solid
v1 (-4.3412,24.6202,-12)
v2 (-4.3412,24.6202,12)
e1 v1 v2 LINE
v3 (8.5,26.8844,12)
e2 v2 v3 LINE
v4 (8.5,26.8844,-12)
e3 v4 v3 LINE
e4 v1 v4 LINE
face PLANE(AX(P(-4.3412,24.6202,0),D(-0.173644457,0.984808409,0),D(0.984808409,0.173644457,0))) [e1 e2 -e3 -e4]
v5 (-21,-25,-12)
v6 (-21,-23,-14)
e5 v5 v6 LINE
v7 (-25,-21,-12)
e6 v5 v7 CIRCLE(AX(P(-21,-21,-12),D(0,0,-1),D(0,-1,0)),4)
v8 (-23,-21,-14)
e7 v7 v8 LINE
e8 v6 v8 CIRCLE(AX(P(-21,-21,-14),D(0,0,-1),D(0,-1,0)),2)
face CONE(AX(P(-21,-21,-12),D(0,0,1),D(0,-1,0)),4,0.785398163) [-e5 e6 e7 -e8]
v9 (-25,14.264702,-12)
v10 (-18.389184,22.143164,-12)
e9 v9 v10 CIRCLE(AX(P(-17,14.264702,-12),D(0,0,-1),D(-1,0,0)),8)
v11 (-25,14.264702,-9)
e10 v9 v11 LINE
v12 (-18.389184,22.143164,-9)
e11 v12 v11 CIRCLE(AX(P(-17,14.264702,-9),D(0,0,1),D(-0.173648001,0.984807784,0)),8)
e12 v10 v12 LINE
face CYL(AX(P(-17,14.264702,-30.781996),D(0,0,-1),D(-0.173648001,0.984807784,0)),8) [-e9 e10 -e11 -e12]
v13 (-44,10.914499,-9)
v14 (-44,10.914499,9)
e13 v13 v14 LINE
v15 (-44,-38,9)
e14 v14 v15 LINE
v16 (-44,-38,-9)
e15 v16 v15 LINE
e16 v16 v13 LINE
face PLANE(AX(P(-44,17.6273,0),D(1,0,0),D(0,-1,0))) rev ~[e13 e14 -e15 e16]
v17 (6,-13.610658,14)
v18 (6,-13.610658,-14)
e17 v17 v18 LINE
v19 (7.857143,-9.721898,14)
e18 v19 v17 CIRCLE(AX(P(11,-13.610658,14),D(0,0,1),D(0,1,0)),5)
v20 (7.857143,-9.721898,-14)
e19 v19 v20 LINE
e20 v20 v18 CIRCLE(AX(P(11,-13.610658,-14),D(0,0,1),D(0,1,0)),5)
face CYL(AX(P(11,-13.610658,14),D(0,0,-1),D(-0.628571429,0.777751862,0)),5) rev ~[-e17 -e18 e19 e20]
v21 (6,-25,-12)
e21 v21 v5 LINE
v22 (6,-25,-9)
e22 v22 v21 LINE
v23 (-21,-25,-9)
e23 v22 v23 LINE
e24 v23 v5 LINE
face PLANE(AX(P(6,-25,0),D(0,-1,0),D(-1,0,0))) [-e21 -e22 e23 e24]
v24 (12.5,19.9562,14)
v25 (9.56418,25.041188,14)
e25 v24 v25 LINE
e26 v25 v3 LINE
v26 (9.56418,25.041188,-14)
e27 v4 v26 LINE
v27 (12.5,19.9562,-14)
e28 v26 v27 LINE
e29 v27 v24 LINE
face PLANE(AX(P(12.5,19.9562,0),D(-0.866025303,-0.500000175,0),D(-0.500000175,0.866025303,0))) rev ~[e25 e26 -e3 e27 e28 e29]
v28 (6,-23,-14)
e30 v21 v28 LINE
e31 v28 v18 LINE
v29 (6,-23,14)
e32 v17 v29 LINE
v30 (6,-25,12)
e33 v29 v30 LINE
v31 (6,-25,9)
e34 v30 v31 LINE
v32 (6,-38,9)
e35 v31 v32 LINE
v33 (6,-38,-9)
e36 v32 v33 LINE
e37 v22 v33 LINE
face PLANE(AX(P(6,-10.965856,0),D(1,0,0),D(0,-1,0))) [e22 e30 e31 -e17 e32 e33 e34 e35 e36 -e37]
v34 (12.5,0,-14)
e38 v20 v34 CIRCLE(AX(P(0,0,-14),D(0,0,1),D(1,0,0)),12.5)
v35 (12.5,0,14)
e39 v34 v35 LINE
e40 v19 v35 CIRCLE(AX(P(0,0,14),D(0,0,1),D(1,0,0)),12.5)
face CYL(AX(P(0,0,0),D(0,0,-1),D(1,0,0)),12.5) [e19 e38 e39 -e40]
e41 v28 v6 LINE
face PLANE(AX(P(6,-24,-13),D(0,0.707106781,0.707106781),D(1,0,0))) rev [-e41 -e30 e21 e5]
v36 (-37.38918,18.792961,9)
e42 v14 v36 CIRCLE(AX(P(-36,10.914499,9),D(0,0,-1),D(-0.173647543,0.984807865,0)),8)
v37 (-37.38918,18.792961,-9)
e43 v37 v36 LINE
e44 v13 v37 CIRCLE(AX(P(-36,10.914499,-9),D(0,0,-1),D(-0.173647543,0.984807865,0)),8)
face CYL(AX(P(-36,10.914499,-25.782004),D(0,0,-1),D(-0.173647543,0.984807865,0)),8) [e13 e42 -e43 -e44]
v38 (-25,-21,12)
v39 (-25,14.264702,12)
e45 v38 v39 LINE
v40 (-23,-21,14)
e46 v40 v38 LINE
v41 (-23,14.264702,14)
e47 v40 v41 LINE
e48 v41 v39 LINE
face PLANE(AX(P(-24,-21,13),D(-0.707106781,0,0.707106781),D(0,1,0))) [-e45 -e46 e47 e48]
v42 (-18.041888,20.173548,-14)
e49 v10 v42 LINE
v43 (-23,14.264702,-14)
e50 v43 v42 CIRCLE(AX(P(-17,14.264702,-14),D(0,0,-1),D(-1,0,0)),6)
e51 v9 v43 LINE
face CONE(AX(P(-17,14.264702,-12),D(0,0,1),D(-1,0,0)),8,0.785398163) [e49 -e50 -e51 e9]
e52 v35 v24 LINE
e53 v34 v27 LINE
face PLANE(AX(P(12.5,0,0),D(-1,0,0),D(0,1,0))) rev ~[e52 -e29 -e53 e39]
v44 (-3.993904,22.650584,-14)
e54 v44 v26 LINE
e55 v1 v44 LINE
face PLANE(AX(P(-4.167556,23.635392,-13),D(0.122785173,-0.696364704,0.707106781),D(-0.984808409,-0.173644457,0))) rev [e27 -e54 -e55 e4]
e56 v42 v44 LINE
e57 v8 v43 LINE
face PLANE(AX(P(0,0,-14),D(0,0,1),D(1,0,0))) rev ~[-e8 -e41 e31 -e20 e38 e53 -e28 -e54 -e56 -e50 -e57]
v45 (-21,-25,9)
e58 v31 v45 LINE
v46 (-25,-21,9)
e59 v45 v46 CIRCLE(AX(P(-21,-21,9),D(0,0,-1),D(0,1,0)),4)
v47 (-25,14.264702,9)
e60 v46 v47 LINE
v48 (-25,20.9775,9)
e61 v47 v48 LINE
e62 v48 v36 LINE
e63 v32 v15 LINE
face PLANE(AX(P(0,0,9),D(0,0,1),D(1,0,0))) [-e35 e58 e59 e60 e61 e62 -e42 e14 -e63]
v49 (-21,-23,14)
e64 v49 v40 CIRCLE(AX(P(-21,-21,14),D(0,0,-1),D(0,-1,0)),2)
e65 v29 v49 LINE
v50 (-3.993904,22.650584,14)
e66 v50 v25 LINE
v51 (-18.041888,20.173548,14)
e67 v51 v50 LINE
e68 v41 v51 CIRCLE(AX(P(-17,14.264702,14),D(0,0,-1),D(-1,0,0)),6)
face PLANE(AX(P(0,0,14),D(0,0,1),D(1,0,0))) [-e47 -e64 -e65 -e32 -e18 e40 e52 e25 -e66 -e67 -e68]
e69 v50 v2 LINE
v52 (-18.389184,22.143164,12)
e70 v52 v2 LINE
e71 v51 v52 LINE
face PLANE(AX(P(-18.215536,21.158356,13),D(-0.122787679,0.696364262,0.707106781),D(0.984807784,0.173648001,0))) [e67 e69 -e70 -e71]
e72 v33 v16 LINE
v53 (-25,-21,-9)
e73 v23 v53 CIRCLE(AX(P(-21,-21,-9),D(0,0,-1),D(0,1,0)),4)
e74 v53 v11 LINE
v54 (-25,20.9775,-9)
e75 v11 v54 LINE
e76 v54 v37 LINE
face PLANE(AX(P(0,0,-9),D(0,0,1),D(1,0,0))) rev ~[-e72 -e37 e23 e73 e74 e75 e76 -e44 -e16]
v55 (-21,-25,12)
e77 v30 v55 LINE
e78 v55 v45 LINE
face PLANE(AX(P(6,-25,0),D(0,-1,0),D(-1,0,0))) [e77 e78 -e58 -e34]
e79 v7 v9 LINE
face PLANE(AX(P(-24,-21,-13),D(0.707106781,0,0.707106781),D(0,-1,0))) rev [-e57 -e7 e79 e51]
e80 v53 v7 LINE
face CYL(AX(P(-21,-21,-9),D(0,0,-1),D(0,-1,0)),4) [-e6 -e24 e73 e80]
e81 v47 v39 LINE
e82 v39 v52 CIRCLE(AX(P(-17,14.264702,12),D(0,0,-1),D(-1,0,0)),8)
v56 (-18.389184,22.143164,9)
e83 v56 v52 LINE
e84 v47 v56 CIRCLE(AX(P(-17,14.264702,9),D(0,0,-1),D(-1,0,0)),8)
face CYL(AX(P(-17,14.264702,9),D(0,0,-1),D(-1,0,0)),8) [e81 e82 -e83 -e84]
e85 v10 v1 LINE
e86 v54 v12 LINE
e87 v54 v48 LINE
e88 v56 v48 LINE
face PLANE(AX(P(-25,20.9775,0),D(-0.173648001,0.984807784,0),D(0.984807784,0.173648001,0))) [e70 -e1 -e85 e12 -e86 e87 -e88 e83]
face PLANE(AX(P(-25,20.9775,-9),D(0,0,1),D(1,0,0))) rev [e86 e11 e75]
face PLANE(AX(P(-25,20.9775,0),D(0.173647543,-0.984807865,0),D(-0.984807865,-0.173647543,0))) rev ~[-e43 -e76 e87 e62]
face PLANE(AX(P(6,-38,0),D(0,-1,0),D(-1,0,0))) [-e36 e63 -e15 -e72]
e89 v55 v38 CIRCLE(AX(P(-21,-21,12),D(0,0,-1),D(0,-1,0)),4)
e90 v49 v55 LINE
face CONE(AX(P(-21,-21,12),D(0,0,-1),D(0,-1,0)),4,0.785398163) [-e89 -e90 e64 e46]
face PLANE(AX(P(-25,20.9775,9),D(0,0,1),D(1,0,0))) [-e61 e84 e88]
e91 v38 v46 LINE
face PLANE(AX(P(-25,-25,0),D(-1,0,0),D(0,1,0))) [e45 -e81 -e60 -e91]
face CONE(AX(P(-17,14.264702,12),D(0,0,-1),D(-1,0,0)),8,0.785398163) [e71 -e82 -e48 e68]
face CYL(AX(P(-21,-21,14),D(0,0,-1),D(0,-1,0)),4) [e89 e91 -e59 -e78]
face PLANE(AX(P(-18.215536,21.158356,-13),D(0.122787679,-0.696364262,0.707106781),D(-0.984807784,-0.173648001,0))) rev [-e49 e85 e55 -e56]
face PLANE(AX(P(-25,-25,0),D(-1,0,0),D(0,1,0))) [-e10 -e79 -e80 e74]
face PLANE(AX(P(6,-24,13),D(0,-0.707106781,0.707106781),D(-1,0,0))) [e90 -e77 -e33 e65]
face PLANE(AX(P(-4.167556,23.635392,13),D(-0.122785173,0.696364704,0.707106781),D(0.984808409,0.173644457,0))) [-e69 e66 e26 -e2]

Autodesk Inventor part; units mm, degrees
ref_plane "YZ Plane" through (0, 0, 0) normal (1, 0, 0) x (0, 1, 0)
ref_plane "XZ Plane" through (0, 0, 0) normal (0, 1, 0) x (-1, 0, 0)
ref_plane "XY Plane" through (0, 0, 0) normal (0, 0, 1) x (1, 0, 0)
sketch "Sketch1" plane through (0, 0, 0) normal (0, 0, 1) x (1, 0, 0)
  circle A0 centre (0, 0) radius 12.5
  circle A1 centre (0, 0) radius 25
  line L0 (-25, 0) -> (6, 0)
  line L1 (6, 0) -> (6, -25)
  line L2 (6, -25) -> (-25, -25)
  line L3 (-25, -25) -> (-25, 0)
  line L4 (12.5, 0) -> (12.5, 19.9562)
  line L5 (12.5, 19.9562) -> (8.5, 26.8844)
  line L6 (-4.3412, 24.6202) -> (8.5, 26.8844)
  line L7 (-25, 0) -> (-25, 20.9775)
  line L8 (-25, 20.9775) -> (-4.3412, 24.6202)
  line L9 (-20, -38) -> (0, -38) construction
  point P0 (6, -10.9659)
  point P1 (0, -25)
  point P2 (6, -24.2693)
  point P3 (-12.5, 0)
  dimension "d0" = 25
  dimension "d1" = 50
  dimension "d2" = 6
  dimension "d7" = 150
  dimension "d8" = 4
  dimension "d9" = 110
  dimension "d13" = 38
extrude "Extrusion1" add sketch "Sketch1" along normal mid plane 28 contours A0 L1 L0 | A0 L0 A1 L5 L4 | L0 L1 A0 | A0 L1 A1 L0 | L7 L8 A1 | A1 L2 L3 | L1 L2 A1 | A1 L6 L5
fillet "Fillet1" radius 5 1 edges at (6, -10.9659, 0)
sketch "Sketch2" plane through (0, 0, 0) normal (0, 0, 1) x (1, 0, 0)
  line L0 (8.5, 26.8844) -> (12.5, 19.9562) projected
  line L1 (12.5, 19.9562) -> (12.5, 0) projected
  arc A0 (7.8571, -9.7219) -> (12.5, 0) centre (0, 0) ccw projected
  arc A1 (7.8571, -9.7219) -> (6, -13.6107) centre (11, -13.6107) ccw projected
  line L2 (6, -13.6107) -> (6, -25) projected
  line L3 (6, -25) -> (-25, -25) projected
  line L4 (-25, -25) -> (-25, 20.9775) projected
  line L5 (-25, 20.9775) -> (8.5, 26.8844) projected
  line L6 (-25, 20.9775) -> (-44, 17.6273)
  line L7 (-44, 17.6273) -> (-44, -25)
  line L8 (-44, -25) -> (-25, -25)
  line L9 (8.5, 26.8844) -> (-25, 20.9775) projected
  line L10 (-44, -25) -> (6, -25)
  line L11 (6, -25) -> (6, -38)
  line L12 (6, -38) -> (-44, -38)
  line L13 (-44, -38) -> (-44, -25)
  line L14 (6, -25) -> (6, -13.6107) projected
  dimension "d14" = 38
  dimension "d21" = 50
extrude "Extrusion2" add sketch "Sketch2" along normal mid plane 18 contours L4 L8 L7 L6 | L3 L11 L12 L13 L8
fillet "Fillet4" radius 8 3 edges at (-25, 20.9775, -11.5) (-25, 20.9775, 11.5) (-44, 17.6273, 0)
fillet "Fillet3" radius 4 2 edges at (-25, -25, 11.5) (-25, -25, -11.5)
chamfer "Chamfer1" distance 2 angle 45 10 edges at (-4.9446, 24.5138, -14) (-23.1284, 19.407, -14) (-25, -3.3677, -14) (-23.8284, -23.8284, -14) (-7.5, -25, -14) (-4.9446, 24.5138, 14) (-23.1284, 19.407, 14) (-25, -3.3677, 14) (-23.8284, -23.8284, 14) (-7.5, -25, 14)
properties part number "Idler Block Left"
